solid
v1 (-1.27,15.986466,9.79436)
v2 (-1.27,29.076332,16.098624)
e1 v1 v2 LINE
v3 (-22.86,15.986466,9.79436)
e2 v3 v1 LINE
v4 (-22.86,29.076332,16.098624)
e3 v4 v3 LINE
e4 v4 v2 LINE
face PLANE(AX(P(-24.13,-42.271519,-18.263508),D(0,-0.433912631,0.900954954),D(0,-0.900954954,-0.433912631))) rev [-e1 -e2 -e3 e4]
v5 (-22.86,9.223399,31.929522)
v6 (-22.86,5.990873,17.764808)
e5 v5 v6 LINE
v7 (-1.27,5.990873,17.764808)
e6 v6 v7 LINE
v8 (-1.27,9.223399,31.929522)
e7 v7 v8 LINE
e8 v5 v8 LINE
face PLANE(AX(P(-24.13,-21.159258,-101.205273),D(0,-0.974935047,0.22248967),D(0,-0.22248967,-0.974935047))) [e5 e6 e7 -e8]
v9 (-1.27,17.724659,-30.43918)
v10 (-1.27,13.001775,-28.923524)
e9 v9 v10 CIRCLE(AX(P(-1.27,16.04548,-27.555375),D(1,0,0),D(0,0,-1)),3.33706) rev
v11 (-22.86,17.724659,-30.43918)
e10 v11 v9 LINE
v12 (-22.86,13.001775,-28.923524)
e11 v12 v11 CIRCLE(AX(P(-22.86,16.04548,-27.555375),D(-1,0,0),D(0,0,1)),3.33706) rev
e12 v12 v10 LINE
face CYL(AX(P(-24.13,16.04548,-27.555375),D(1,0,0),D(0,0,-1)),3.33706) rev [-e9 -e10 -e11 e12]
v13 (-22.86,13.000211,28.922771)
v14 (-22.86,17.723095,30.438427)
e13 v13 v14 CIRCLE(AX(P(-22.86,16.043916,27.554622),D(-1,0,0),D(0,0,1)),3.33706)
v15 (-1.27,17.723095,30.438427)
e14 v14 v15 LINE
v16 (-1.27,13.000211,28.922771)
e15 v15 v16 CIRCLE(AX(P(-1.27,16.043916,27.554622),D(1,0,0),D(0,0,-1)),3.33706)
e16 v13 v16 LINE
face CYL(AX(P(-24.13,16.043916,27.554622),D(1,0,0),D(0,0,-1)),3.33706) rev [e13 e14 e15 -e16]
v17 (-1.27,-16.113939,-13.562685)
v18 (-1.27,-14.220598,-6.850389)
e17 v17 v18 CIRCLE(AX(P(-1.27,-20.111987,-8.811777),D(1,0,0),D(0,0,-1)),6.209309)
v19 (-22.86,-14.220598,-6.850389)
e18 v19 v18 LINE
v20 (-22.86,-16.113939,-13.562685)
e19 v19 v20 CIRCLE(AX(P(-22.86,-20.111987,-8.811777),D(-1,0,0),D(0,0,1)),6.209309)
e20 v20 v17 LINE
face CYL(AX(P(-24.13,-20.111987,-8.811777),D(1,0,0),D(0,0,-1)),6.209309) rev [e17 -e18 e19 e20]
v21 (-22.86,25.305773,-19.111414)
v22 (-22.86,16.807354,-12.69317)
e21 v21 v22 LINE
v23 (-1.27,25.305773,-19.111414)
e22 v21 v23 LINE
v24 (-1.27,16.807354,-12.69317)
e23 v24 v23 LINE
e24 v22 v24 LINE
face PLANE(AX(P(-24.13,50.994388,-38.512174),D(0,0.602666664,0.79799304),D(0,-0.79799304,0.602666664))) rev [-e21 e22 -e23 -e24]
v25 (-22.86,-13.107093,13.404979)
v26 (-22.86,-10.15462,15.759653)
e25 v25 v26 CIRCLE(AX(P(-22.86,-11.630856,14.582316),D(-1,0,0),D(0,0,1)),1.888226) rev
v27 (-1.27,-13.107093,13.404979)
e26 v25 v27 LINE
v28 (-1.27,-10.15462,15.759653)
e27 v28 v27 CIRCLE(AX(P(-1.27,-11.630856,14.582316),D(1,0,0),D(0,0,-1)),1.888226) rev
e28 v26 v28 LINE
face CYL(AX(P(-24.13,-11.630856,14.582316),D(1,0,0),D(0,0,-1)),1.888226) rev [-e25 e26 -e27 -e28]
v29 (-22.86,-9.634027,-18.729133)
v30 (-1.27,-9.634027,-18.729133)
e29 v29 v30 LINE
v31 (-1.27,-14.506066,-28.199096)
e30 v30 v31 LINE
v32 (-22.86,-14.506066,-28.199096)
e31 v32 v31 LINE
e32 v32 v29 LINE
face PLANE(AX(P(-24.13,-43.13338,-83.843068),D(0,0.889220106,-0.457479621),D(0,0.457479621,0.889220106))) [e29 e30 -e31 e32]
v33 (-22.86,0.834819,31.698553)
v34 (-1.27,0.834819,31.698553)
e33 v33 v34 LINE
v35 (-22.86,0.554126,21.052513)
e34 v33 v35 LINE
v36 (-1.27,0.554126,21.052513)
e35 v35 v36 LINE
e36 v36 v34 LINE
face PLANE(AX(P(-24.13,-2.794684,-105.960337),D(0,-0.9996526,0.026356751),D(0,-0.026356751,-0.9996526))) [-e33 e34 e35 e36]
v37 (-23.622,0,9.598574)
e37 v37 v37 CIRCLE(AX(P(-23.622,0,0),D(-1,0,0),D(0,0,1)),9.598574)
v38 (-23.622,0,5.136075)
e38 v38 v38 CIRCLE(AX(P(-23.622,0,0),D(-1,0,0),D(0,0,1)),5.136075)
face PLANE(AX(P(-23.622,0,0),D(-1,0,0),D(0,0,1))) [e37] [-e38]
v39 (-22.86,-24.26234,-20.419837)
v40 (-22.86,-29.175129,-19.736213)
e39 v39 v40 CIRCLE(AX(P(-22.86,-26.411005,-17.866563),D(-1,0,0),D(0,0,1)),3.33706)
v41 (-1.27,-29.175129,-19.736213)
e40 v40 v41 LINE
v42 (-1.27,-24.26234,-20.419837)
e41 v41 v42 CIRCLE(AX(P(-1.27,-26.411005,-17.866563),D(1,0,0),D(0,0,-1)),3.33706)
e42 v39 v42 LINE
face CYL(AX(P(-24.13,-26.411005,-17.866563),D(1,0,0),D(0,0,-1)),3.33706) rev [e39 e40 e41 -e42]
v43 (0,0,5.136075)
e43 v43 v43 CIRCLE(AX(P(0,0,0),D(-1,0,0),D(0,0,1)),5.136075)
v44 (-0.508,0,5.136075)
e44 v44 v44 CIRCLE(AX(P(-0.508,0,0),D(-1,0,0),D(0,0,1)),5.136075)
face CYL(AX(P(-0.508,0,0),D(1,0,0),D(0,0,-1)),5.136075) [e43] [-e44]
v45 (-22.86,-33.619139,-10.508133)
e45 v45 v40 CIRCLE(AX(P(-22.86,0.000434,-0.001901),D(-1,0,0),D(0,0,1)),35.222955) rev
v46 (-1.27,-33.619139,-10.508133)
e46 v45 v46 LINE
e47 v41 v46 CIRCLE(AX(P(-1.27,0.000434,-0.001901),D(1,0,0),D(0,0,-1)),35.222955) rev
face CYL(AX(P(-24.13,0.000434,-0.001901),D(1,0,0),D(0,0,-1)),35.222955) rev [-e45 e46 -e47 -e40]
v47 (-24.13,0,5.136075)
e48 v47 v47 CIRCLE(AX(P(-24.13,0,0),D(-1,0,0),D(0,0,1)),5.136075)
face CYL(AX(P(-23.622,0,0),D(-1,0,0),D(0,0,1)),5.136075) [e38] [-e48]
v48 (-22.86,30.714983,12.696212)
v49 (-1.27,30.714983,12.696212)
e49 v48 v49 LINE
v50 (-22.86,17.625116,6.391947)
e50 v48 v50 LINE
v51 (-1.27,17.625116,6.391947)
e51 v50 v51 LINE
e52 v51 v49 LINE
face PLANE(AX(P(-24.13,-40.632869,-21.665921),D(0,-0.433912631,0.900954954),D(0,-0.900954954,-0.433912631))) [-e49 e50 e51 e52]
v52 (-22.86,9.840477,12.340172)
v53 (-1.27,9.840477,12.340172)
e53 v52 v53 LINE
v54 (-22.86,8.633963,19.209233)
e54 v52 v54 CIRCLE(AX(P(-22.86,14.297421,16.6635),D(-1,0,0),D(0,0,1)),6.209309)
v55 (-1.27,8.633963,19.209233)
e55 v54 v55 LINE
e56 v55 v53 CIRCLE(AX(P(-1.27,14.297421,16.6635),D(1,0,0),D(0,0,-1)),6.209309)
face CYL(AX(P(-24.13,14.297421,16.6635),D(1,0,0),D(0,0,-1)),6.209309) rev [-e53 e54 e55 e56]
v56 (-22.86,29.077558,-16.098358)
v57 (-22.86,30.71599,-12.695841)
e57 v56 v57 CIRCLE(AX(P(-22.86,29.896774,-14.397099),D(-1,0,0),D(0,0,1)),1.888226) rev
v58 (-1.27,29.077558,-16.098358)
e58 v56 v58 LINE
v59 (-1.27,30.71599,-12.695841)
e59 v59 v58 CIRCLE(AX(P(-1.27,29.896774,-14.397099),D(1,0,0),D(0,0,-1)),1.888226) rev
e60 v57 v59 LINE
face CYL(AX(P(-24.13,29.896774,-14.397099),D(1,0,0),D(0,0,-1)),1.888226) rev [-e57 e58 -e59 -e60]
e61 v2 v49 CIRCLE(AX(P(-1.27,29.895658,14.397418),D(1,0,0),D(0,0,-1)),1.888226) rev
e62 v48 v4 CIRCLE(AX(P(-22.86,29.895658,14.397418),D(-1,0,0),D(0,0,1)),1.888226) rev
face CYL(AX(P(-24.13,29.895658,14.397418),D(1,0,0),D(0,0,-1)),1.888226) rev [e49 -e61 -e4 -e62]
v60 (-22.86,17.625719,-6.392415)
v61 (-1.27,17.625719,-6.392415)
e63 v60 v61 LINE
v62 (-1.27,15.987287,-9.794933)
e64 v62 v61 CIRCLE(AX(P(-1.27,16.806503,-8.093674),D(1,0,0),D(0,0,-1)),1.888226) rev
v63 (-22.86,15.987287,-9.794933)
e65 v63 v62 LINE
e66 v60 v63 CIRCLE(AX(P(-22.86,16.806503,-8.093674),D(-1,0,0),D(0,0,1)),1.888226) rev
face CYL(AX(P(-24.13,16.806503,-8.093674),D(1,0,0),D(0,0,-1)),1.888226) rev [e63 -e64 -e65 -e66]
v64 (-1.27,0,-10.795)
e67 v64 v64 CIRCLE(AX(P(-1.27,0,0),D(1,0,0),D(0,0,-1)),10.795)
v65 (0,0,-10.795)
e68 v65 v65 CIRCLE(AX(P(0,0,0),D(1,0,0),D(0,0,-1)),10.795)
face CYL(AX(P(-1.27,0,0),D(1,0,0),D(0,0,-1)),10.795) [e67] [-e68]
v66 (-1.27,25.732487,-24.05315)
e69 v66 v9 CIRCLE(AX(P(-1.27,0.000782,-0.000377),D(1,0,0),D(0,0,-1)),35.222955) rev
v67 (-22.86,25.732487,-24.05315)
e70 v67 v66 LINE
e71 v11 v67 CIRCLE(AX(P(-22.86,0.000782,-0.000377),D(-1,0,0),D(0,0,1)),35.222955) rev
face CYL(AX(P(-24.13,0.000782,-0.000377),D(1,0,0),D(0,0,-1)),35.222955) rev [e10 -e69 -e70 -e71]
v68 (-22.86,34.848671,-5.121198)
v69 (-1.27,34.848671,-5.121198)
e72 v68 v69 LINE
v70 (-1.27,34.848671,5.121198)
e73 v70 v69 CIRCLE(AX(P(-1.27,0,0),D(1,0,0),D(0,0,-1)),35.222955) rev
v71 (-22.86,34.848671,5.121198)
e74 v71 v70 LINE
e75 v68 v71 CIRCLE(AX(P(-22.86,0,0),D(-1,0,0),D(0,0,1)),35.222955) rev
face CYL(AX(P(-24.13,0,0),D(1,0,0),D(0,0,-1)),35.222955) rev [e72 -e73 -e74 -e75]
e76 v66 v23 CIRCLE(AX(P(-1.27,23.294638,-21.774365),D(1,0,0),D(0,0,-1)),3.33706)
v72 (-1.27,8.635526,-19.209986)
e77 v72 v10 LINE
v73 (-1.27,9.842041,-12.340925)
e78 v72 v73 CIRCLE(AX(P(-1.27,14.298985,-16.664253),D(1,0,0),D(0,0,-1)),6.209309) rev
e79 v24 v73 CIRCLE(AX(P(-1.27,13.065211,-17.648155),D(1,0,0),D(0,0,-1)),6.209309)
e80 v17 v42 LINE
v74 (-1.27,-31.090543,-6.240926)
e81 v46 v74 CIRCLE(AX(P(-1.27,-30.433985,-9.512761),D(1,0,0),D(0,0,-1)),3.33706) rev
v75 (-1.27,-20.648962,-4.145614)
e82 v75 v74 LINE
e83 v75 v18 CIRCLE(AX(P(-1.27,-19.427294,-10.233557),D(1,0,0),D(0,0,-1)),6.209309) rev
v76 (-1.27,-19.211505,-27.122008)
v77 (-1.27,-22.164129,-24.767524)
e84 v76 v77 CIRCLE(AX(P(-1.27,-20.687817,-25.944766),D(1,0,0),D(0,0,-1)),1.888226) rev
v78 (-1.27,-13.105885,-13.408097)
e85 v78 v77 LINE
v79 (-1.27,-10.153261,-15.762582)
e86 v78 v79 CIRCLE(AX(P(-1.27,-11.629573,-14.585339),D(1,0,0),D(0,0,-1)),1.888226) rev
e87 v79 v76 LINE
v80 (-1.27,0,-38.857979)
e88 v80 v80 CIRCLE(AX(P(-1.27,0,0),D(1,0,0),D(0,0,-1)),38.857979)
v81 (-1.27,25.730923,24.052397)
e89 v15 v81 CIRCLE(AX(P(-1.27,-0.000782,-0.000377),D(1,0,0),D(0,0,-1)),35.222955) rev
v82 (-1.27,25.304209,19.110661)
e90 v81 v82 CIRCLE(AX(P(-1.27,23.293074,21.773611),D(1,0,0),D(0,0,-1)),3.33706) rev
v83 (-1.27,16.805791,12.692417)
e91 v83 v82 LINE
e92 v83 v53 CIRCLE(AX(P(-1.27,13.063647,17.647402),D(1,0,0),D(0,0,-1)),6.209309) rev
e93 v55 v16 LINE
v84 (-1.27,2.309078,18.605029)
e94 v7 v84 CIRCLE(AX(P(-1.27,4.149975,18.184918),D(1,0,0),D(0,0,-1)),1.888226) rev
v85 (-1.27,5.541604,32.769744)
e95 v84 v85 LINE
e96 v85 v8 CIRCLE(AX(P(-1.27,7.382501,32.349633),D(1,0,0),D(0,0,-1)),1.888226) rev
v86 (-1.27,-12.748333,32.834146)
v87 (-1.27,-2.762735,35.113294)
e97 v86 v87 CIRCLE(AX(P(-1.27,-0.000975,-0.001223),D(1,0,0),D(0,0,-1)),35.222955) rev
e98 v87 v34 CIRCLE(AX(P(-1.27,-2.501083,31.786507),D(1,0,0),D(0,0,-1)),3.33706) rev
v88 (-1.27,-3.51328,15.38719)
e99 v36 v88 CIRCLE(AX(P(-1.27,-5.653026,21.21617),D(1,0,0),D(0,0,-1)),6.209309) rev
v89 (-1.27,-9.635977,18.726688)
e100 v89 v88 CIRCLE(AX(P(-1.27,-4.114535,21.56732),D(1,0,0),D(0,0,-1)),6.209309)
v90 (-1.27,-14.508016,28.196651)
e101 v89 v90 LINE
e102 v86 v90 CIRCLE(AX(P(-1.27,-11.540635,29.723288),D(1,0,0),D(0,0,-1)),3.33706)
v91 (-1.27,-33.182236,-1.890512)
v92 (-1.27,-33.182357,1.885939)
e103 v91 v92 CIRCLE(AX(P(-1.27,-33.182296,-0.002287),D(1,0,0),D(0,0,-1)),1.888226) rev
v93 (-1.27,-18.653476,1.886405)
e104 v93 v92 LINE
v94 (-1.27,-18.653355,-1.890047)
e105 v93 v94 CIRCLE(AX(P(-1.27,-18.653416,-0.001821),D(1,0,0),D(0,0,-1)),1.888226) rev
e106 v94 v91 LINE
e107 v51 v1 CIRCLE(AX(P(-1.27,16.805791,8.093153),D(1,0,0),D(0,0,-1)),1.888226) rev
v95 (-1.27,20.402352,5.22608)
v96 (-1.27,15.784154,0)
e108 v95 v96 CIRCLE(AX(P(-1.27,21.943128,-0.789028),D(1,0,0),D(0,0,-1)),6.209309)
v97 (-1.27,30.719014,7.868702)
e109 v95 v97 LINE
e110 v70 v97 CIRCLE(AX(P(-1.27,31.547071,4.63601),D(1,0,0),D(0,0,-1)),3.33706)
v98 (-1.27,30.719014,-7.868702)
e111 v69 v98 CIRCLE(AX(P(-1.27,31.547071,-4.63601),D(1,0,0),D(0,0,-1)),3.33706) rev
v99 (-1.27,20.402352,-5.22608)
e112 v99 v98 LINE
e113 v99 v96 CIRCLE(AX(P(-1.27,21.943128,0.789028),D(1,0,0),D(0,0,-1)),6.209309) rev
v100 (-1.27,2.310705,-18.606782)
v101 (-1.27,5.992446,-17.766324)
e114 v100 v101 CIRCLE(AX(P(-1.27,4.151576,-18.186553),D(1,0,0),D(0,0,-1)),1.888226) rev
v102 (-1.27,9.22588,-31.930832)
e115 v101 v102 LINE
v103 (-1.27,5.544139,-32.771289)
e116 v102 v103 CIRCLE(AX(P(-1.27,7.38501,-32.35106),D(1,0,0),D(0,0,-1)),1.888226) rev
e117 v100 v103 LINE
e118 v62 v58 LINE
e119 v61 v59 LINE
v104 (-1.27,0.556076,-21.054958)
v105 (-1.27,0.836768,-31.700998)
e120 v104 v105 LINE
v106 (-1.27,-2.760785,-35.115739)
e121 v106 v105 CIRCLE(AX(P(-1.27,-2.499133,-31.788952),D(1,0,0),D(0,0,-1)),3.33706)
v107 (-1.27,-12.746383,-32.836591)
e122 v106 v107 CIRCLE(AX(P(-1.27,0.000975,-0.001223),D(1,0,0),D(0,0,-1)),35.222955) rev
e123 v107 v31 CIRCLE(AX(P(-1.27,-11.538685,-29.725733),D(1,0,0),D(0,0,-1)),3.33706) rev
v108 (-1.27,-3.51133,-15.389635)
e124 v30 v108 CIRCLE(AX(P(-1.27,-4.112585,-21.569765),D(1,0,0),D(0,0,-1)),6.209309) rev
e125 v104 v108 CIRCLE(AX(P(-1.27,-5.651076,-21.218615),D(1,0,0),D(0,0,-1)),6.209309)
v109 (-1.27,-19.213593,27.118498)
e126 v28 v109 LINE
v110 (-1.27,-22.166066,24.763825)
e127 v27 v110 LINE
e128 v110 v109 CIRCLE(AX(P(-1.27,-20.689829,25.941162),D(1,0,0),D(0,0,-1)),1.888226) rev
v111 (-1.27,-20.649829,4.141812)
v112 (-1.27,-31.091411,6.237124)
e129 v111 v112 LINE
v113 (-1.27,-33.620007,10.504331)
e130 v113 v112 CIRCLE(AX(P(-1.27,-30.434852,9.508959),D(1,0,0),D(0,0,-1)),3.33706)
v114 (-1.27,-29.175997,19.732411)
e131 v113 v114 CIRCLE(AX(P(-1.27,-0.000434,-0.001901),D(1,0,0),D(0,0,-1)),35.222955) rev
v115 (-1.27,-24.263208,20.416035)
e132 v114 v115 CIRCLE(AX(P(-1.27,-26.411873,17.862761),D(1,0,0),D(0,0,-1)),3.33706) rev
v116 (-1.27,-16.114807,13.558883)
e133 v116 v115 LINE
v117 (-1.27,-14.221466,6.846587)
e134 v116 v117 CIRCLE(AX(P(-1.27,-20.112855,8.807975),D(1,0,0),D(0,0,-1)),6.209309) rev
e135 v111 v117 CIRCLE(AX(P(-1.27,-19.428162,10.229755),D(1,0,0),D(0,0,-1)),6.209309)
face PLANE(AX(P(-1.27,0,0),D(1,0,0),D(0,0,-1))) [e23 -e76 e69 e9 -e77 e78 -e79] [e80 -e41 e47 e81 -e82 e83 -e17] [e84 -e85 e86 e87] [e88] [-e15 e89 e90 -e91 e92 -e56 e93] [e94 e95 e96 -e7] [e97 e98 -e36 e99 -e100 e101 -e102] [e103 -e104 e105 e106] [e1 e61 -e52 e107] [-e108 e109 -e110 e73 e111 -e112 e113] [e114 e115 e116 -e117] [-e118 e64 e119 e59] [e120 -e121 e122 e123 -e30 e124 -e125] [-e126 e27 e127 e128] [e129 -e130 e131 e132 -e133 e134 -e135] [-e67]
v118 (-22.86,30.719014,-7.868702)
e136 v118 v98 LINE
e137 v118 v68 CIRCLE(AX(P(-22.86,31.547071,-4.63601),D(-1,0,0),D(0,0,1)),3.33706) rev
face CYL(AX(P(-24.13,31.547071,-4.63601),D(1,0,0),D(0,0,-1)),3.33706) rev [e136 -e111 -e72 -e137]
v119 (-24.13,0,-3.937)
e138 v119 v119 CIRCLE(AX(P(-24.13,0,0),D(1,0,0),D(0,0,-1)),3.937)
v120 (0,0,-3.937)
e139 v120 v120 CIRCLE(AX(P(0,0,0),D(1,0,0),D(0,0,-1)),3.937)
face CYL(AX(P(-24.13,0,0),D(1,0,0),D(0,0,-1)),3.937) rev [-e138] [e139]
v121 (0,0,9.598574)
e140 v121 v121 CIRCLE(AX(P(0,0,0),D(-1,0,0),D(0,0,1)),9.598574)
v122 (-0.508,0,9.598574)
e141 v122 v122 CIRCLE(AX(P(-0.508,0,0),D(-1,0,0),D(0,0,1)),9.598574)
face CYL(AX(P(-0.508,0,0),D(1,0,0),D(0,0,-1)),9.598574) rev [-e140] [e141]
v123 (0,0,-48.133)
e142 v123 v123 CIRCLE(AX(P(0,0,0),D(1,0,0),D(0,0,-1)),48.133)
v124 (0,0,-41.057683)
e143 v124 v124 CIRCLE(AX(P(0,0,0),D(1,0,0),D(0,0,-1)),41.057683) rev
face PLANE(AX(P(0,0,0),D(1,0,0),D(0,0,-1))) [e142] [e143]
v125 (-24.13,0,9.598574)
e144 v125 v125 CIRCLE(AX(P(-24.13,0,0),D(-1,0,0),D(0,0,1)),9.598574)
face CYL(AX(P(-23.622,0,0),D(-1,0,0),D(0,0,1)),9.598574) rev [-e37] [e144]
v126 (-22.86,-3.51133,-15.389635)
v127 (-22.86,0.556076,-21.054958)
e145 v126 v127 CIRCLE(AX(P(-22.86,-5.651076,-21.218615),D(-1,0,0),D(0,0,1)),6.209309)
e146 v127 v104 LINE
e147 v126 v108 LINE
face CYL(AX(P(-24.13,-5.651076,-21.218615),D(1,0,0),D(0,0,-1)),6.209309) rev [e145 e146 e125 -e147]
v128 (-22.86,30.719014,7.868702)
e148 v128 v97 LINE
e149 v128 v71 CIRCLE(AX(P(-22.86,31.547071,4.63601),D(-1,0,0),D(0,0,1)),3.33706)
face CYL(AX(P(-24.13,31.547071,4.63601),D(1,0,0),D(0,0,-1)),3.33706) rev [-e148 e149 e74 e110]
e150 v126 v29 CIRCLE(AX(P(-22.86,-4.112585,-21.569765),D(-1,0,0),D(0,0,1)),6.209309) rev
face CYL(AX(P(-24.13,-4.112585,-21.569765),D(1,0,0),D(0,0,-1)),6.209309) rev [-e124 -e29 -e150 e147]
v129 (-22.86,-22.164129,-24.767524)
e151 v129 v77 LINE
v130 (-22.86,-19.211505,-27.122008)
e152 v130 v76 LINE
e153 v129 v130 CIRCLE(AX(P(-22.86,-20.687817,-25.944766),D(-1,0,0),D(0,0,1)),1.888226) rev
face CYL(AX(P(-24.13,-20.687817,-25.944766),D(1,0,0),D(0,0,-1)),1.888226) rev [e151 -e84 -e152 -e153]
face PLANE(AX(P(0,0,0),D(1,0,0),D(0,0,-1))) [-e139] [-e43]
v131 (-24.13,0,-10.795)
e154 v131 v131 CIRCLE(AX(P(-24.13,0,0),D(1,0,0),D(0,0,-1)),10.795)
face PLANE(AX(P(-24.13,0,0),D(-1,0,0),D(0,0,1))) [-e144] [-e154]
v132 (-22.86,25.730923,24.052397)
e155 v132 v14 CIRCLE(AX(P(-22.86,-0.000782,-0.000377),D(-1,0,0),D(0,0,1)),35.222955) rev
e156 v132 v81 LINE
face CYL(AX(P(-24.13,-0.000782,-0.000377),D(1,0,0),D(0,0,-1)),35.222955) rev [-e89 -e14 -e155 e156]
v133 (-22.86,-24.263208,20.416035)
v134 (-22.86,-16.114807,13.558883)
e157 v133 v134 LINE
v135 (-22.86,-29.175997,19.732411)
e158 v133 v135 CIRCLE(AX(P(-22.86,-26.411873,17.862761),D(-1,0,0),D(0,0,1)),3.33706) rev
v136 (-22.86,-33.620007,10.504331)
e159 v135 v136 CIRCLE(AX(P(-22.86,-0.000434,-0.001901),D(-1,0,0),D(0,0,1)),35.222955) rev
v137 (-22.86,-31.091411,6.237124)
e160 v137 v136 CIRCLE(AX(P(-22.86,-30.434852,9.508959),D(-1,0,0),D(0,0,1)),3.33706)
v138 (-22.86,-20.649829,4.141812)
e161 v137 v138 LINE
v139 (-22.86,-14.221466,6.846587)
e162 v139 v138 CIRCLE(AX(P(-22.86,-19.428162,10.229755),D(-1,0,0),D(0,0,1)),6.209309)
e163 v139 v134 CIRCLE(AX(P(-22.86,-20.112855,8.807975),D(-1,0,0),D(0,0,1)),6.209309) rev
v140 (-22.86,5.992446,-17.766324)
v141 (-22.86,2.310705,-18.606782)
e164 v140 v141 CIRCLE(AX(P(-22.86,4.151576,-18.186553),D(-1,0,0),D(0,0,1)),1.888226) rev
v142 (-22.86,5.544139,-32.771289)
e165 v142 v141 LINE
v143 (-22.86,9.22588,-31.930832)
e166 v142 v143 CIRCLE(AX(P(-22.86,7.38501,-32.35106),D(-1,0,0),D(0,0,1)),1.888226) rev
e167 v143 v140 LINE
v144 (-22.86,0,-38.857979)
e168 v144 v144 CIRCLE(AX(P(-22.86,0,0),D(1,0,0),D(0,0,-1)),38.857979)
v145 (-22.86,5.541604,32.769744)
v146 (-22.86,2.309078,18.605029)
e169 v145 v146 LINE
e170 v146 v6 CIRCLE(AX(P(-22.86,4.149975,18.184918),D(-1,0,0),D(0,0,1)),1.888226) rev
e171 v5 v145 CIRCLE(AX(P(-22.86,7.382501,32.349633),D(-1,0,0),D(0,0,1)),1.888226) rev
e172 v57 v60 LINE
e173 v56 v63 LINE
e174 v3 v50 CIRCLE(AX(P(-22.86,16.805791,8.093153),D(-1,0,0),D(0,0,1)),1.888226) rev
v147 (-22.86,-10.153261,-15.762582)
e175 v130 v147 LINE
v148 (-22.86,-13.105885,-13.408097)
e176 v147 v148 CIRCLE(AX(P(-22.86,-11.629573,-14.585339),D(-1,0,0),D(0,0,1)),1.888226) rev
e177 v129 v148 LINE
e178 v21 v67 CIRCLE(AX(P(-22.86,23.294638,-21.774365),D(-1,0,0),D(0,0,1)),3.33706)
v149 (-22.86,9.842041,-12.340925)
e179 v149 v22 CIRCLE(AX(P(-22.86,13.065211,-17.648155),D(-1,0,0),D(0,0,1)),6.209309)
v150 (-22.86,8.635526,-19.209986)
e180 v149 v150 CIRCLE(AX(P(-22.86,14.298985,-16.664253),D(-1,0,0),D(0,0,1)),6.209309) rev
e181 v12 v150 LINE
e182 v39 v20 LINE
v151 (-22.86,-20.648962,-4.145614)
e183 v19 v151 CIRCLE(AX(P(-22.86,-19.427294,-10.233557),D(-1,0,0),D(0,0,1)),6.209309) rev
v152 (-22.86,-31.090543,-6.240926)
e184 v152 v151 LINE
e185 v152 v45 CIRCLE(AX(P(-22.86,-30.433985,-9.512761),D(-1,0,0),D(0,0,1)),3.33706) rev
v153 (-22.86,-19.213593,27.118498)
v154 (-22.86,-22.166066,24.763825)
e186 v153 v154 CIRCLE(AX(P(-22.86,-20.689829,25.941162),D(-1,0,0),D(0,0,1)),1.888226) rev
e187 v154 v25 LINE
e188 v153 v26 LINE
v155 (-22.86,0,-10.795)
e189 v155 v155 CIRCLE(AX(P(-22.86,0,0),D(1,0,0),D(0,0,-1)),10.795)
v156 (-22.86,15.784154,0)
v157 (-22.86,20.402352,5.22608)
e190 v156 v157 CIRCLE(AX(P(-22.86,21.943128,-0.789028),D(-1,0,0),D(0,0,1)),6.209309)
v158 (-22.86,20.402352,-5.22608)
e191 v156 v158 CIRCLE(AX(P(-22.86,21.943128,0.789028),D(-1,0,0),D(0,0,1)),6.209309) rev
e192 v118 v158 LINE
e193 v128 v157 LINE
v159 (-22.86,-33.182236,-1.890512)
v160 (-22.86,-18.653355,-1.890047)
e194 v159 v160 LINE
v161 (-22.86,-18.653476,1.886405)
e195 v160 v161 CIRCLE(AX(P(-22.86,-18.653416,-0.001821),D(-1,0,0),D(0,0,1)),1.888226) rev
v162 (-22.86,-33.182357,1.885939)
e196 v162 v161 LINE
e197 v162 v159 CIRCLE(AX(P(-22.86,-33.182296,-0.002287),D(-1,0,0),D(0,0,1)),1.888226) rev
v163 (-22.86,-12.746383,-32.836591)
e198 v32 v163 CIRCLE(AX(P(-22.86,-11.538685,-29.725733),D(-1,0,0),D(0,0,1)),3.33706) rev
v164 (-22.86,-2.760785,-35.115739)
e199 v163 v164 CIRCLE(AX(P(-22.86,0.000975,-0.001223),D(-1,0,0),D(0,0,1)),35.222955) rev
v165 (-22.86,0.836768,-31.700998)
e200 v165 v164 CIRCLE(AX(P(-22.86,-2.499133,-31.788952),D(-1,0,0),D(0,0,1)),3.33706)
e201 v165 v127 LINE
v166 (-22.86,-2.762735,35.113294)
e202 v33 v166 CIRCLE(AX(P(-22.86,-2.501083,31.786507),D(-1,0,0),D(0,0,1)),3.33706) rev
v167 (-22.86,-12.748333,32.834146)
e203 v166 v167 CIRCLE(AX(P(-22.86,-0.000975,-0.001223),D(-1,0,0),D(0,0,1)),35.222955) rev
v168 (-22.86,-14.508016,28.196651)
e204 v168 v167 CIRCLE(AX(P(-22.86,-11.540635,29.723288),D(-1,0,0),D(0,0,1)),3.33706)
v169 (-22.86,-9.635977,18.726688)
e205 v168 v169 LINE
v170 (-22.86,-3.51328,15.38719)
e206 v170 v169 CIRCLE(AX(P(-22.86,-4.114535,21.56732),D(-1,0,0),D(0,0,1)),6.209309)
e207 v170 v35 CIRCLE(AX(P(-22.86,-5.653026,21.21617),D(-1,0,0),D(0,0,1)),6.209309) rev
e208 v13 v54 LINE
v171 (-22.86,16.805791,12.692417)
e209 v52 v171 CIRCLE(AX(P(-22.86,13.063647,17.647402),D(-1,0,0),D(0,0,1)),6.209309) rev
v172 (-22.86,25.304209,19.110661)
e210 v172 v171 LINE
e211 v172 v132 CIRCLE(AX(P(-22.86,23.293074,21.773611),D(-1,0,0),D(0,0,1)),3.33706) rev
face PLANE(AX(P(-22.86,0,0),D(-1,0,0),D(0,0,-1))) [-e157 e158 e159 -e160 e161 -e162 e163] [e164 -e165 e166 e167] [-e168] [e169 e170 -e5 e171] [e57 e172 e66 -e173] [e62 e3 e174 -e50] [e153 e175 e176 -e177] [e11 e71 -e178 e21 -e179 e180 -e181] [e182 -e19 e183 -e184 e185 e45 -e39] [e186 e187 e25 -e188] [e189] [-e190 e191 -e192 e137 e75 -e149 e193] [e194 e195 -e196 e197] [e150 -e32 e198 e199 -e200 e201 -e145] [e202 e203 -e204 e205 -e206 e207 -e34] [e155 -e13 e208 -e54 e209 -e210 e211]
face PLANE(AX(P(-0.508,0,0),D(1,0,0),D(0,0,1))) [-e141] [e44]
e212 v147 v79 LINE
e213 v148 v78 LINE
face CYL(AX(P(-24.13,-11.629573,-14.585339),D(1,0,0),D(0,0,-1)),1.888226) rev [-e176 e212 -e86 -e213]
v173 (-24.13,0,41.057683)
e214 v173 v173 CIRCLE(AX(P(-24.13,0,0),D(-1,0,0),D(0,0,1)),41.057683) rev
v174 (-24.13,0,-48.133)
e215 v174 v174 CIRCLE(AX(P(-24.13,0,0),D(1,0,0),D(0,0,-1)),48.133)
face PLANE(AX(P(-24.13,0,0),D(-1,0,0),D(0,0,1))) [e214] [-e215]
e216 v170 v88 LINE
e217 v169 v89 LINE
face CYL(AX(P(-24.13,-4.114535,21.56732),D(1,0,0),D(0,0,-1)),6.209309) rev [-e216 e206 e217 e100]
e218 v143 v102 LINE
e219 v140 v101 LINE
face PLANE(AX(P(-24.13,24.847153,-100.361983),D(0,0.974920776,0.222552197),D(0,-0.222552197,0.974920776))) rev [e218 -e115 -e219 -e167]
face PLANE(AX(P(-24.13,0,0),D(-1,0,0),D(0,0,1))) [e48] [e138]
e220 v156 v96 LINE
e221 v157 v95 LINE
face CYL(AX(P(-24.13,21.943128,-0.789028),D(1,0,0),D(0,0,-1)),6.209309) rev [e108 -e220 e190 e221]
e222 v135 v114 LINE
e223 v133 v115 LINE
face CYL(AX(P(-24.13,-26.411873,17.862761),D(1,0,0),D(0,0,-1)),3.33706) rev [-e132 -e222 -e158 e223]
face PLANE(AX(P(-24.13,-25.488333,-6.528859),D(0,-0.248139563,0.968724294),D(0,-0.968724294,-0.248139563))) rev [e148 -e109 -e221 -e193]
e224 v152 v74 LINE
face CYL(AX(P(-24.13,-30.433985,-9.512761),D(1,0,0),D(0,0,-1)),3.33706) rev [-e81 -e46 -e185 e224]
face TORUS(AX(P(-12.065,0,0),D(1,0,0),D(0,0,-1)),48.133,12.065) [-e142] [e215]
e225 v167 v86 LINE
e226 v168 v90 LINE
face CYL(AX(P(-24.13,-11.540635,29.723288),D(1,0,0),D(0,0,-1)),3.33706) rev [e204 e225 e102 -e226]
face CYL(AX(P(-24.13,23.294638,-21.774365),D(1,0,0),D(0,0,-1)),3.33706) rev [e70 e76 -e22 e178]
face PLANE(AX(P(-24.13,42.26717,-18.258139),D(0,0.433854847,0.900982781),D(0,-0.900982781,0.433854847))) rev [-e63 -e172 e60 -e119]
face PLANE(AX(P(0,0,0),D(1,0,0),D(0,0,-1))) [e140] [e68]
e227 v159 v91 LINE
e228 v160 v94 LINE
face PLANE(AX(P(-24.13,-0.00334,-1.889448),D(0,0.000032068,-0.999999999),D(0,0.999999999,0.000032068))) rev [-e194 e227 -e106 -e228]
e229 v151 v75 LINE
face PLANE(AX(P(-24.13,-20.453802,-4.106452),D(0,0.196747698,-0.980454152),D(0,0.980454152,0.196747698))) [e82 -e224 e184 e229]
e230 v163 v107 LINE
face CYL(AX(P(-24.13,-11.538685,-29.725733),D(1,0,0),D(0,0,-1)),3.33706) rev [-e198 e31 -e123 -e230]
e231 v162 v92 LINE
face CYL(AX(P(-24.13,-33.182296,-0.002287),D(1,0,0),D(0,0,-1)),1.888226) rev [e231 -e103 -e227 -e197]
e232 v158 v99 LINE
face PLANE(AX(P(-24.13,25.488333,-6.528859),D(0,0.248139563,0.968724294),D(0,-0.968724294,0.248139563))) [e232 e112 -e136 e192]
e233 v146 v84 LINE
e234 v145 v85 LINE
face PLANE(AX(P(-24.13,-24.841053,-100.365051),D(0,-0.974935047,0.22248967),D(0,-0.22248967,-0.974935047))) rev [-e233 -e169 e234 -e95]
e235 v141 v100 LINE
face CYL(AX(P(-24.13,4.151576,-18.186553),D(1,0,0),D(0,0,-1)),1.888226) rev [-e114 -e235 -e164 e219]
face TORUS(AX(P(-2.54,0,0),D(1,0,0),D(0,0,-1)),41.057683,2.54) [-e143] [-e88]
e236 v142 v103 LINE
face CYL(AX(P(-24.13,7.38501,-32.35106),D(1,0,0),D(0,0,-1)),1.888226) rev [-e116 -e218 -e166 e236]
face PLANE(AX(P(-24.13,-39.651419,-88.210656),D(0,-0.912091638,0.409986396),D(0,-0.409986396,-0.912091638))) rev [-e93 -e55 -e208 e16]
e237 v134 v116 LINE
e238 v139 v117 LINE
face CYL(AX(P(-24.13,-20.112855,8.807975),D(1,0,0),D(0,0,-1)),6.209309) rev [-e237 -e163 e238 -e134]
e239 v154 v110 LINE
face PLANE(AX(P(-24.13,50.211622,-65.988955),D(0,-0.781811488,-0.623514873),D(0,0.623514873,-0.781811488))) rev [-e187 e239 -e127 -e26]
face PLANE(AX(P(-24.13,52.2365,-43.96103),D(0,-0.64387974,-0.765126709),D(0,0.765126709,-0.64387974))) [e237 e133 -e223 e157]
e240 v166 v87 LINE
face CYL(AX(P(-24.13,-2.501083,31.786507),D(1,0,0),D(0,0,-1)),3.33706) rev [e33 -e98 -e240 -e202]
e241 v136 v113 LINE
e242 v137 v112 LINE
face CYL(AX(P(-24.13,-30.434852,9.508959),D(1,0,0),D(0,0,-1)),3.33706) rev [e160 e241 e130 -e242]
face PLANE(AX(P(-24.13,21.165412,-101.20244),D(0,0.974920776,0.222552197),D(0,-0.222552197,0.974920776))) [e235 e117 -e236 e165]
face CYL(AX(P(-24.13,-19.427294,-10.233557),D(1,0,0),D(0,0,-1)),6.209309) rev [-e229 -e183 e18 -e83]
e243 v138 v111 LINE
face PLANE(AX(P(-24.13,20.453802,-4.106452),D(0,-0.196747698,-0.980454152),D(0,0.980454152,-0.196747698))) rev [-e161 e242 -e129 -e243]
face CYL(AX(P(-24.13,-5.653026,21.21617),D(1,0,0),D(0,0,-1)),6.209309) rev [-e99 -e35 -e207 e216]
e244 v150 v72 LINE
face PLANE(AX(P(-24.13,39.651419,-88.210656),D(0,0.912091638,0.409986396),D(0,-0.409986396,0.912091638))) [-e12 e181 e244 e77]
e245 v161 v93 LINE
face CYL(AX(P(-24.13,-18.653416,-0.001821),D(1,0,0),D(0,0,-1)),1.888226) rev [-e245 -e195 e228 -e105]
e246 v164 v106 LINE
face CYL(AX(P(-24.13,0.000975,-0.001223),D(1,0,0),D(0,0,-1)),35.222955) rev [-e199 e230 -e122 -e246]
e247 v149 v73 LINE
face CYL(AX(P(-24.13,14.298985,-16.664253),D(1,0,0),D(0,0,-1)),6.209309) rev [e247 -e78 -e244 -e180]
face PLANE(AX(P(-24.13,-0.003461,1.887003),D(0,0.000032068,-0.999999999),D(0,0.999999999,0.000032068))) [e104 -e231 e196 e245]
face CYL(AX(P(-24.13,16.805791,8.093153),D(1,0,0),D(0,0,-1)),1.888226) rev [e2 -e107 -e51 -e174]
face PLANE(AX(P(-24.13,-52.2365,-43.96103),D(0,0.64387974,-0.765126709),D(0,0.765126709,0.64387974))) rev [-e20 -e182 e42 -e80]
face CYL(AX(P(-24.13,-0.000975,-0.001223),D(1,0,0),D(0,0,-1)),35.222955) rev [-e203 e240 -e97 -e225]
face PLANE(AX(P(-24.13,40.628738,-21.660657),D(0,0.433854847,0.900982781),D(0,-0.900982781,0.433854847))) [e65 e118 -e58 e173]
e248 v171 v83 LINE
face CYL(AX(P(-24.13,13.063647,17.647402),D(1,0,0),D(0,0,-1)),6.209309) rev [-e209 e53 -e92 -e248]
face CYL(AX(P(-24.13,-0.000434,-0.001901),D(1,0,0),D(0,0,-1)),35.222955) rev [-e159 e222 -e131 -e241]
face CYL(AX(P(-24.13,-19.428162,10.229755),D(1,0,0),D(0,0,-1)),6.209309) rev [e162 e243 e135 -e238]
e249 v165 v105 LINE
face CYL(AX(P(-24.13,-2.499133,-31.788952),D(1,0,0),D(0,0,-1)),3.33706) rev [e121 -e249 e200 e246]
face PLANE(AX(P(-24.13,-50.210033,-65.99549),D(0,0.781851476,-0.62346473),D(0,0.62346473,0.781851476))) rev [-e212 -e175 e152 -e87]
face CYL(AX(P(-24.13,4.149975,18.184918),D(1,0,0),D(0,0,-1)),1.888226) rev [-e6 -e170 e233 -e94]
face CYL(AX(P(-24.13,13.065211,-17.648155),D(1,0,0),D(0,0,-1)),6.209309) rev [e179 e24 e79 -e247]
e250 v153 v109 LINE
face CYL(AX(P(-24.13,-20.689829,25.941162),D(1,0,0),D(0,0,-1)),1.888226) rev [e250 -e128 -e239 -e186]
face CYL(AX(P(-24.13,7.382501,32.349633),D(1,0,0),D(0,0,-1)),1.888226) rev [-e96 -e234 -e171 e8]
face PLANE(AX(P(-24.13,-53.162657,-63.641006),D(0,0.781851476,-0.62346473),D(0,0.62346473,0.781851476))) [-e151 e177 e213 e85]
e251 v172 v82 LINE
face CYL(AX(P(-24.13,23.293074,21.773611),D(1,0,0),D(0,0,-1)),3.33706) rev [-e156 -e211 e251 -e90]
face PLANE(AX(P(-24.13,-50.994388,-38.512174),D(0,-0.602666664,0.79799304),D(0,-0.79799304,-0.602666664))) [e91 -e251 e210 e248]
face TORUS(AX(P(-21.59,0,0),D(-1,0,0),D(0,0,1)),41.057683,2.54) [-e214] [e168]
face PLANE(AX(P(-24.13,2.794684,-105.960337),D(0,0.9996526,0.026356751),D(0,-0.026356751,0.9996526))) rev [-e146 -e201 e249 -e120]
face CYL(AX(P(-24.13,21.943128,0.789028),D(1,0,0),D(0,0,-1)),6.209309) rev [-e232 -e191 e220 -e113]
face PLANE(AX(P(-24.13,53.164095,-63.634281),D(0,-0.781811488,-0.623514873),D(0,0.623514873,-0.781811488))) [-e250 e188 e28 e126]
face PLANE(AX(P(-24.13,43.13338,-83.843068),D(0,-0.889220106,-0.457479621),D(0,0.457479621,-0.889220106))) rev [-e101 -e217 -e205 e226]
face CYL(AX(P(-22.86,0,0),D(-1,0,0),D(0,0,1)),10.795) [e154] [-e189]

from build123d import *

# Parameters (mm, degrees)
SKETCH2_R          = 3.937
CUT_EXTRUDE1_DEPTH = 89.486469768
CUT_EXTRUDE2_DEPTH = 89.486469768
SKETCH5_R          = 38.857978685
SKETCH5_R_2        = 10.795
CUT_EXTRUDE3_DEPTH = 1.27
SKETCH6_R          = 9.598574497
SKETCH6_R_2        = 5.136074626
CUT_EXTRUDE4_DEPTH = 0.508
FILLET3_R          = 2.54


with BuildPart() as part:
    # Sketch1 → Revolve1 (revolve)
    with BuildSketch(Plane(origin=(0, 0, 0), x_dir=(1, 0, 0), z_dir=(0, 1, 0))):
        with BuildLine():
            Line((0, 0), (-24.13, 0))
            Line((-24.13, 0), (-24.13, 48.133))
            ThreePointArc((-24.13, 48.133), (-12.065, 60.198), (0, 48.133))
            Line((0, 48.133), (0, 0))
        make_face()
    revolve(axis=Axis((0, 0, 0), (-1, 0, 0)))

    # Sketch2 → Cut-Extrude1 (cut, through all)
    with BuildSketch(Plane(origin=(0, 0, 0), x_dir=(0, 0, -1), z_dir=(1, 0, 0))):
        Circle(SKETCH2_R)
    extrude(amount=-CUT_EXTRUDE1_DEPTH, mode=Mode.SUBTRACT)

    # Sketch3 → Cut-Extrude2 (cut, through all)
    with BuildSketch(Plane(origin=(0, 0, 0), x_dir=(0, 0, -1), z_dir=(1, 0, 0))):
        with BuildLine():
            ThreePointArc((-7.868701987, 30.719014265), (-7.414350559, 33.395529437), (-5.121198299, 34.848671341))
            ThreePointArc((-5.121198299, 34.848671341), (0, 35.222955104), (5.121198299, 34.848671341))
            ThreePointArc((5.121198299, 34.848671341), (7.414350559, 33.395529437), (7.868701987, 30.719014265))
            Line((7.868701987, 30.719014265), (5.226080148, 20.402352367))
            ThreePointArc((5.226080148, 20.402352367), (3.322663277, 17.290224183), (0, 15.784154342))
            ThreePointArc((0, 15.784154342), (-3.322663277, 17.290224183), (-5.226080148, 20.402352367))
            Line((-5.226080148, 20.402352367), (-7.868701987, 30.719014265))
        make_face()
        with BuildLine():
            Line((-16.098624321, 29.076332472), (-9.794359632, 15.986465761))
            ThreePointArc((-9.794359632, 15.986465761), (-7.273828196, 15.104584389), (-6.391946824, 17.625115825))
            Line((-6.391946824, 17.625115825), (-12.696211514, 30.714982536))
            ThreePointArc((-12.696211514, 30.714982536), (-15.216742949, 31.596863908), (-16.098624321, 29.076332472))
        make_face()
        with BuildLine():
            ThreePointArc((-12.340172279, 9.840477432), (-15.589311763, 8.181733863), (-19.209232563, 8.633962814))
            Line((-19.209232563, 8.633962814), (-28.922771395, 13.000211347))
            ThreePointArc((-28.922771395, 13.000211347), (-30.732071739, 15.024217511), (-30.438426779, 17.7230953))
            ThreePointArc((-30.438426779, 17.7230953), (-27.538038696, 21.960371467), (-24.052396954, 25.730923416))
            ThreePointArc((-24.052396954, 25.730923416), (-21.486527816, 26.61776289), (-19.11066051, 25.304209225))
            Line((-19.11066051, 25.304209225), (-12.692417211, 16.805790793))
            ThreePointArc((-12.692417211, 16.805790793), (-11.446018427, 13.377259374), (-12.340172279, 9.840477432))
        make_face()
        with BuildLine():
            Line((-32.7697437, 5.541603622), (-18.605029061, 2.309077827))
            ThreePointArc((-18.605029061, 2.309077827), (-16.344020796, 3.729864614), (-17.764807583, 5.99087288))
            Line((-17.764807583, 5.99087288), (-31.929522221, 9.223398675))
            ThreePointArc((-31.929522221, 9.223398675), (-34.190530487, 7.802611888), (-32.7697437, 5.541603622))
        make_face()
        with BuildLine():
            ThreePointArc((-15.387190118, -3.513279694), (-16.116137508, -7.087768933), (-18.726688041, -9.635976839))
            Line((-18.726688041, -9.635976839), (-28.196651006, -14.508015872))
            ThreePointArc((-28.196651006, -14.508015872), (-30.907163058, -14.660636639), (-32.834146044, -12.748332988))
            ThreePointArc((-32.834146044, -12.748332988), (-34.33861956, -7.838819794), (-35.113293701, -2.762734656))
            ThreePointArc((-35.113293701, -2.762734656), (-34.20685948, -0.203722017), (-31.698552836, 0.834818527))
            Line((-31.698552836, 0.834818527), (-21.052512511, 0.554125976))
            ThreePointArc((-21.052512511, 0.554125976), (-17.594861779, -0.60905459), (-15.387190118, -3.513279694))
        make_face()
        with BuildLine():
            Line((-24.763824671, -22.166065784), (-13.404979114, -13.107092807))
            ThreePointArc((-13.404979114, -13.107092807), (-13.106079358, -10.45351929), (-15.759652875, -10.154619535))
            Line((-15.759652875, -10.154619535), (-27.118498432, -19.213592512))
            ThreePointArc((-27.118498432, -19.213592512), (-27.417398188, -21.867166029), (-24.763824671, -22.166065784))
        make_face()
        with BuildLine():
            ThreePointArc((-6.846586936, -14.221465552), (-4.506429979, -17.020037158), (-4.141812449, -20.649829394))
            Line((-4.141812449, -20.649829394), (-6.237124282, -31.091411229))
            ThreePointArc((-6.237124282, -31.091411229), (-7.807777183, -33.305732377), (-10.504330622, -33.620006517))
            ThreePointArc((-10.504330622, -33.620006517), (-15.280766495, -31.735219868), (-19.73241109, -29.175997183))
            ThreePointArc((-19.73241109, -29.175997183), (-21.167975243, -26.87180009), (-20.416035323, -24.263207549))
            Line((-20.416035323, -24.263207549), (-13.558883477, -16.114807003))
            ThreePointArc((-13.558883477, -16.114807003), (-10.493662321, -14.136738026), (-6.846586936, -14.221465552))
        make_face()
        with BuildLine():
            Line((1.890512446, -33.182235549), (1.890046539, -18.653355221))
            ThreePointArc((1.890046539, -18.653355221), (0.001760172, -16.765189956), (-1.886405093, -18.653476323))
            Line((-1.886405093, -18.653476323), (-1.885939187, -33.182356651))
            ThreePointArc((-1.885939187, -33.182356651), (0.00234718, -35.070521916), (1.890512446, -33.182235549))
        make_face()
        with BuildLine():
            ThreePointArc((6.850388874, -14.220597785), (10.497464259, -14.135870258), (13.562685415, -16.113939236))
            Line((13.562685415, -16.113939236), (20.419837261, -24.262339782))
            ThreePointArc((20.419837261, -24.262339782), (21.171777181, -26.870932322), (19.736213028, -29.175129416))
            ThreePointArc((19.736213028, -29.175129416), (15.284568432, -31.734352101), (10.50813256, -33.619138749))
            ThreePointArc((10.50813256, -33.619138749), (7.811579121, -33.30486461), (6.240926219, -31.090543462))
            Line((6.240926219, -31.090543462), (4.145614387, -20.648961626))
            ThreePointArc((4.145614387, -20.648961626), (4.510231917, -17.019169391), (6.850388874, -14.220597785))
        make_face()
        with BuildLine():
            Line((27.122008151, -19.211505151), (15.762581618, -10.153260695))
            ThreePointArc((15.762581618, -10.153260695), (13.109027277, -10.452330638), (13.408097219, -13.105884979))
            Line((13.408097219, -13.105884979), (24.767523753, -22.164129435))
            ThreePointArc((24.767523753, -22.164129435), (27.421078094, -21.865059493), (27.122008151, -19.211505151))
        make_face()
        with BuildLine():
            ThreePointArc((15.389635159, -3.511329838), (17.597306821, -0.607104734), (21.054957553, 0.556075831))
            Line((21.054957553, 0.556075831), (31.700997878, 0.836768383))
            ThreePointArc((31.700997878, 0.836768383), (34.209304522, -0.201772161), (35.115738743, -2.7607848))
            ThreePointArc((35.115738743, -2.7607848), (34.341064602, -7.836869939), (32.836591086, -12.746383132))
            ThreePointArc((32.836591086, -12.746383132), (30.9096081, -14.658686784), (28.199096048, -14.506066016))
            Line((28.199096048, -14.506066016), (18.729133083, -9.634026983))
            ThreePointArc((18.729133083, -9.634026983), (16.11858255, -7.085819077), (15.389635159, -3.511329838))
        make_face()
        with BuildLine():
            Line((31.930831552, 9.225880469), (17.766324261, 5.992446224))
            ThreePointArc((17.766324261, 5.992446224), (16.345682487, 3.73134684), (18.606781871, 2.310705066))
            Line((18.606781871, 2.310705066), (32.771289161, 5.544139311))
            ThreePointArc((32.771289161, 5.544139311), (34.191930935, 7.805238695), (31.930831552, 9.225880469))
        make_face()
        with BuildLine():
            ThreePointArc((12.340925299, 9.842041095), (11.446771448, 13.378823037), (12.693170232, 16.807354456))
            Line((12.693170232, 16.807354456), (19.111413531, 25.305772888))
            ThreePointArc((19.111413531, 25.305772888), (21.487280836, 26.619326553), (24.053149974, 25.732487079))
            ThreePointArc((24.053149974, 25.732487079), (27.538791716, 21.96193513), (30.4391798, 17.724658963))
            ThreePointArc((30.4391798, 17.724658963), (30.732824759, 15.025781174), (28.923524416, 13.00177501))
            Line((28.923524416, 13.00177501), (19.209985583, 8.635526477))
            ThreePointArc((19.209985583, 8.635526477), (15.590064784, 8.183297526), (12.340925299, 9.842041095))
        make_face()
        with BuildLine():
            Line((12.695840543, 30.715989922), (6.392415389, 17.625718912))
            ThreePointArc((6.392415389, 17.625718912), (7.274458414, 15.105244041), (9.794933285, 15.987287066))
            Line((9.794933285, 15.987287066), (16.098358439, 29.077558076))
            ThreePointArc((16.098358439, 29.077558076), (15.216315414, 31.598032947), (12.695840543, 30.715989922))
        make_face()
    extrude(amount=-CUT_EXTRUDE2_DEPTH, mode=Mode.SUBTRACT)

    # Sketch5 → Cut-Extrude3 (cut)
    with BuildSketch(Plane(origin=(0, 0, 0), x_dir=(0, 0, -1), z_dir=(1, 0, 0))):
        Circle(SKETCH5_R)
        Circle(SKETCH5_R_2, mode=Mode.SUBTRACT)
    cut_extrude3 = extrude(amount=-CUT_EXTRUDE3_DEPTH, mode=Mode.SUBTRACT)

    # Sketch6 → Cut-Extrude4 (cut)
    with BuildSketch(Plane.ZY.offset(24.13)):
        Circle(SKETCH6_R)
        Circle(SKETCH6_R_2, mode=Mode.SUBTRACT)
    cut_extrude4 = extrude(amount=-CUT_EXTRUDE4_DEPTH, mode=Mode.SUBTRACT)

    # Mirror8: Cut-Extrude3 across plane
    add(cut_extrude3.mirror(Plane(origin=(-12.065, 0, 0), x_dir=(0, 0, 1), z_dir=(1, 0, 0))), mode=Mode.SUBTRACT)

    # Mirror11: Cut-Extrude4 across plane
    add(cut_extrude4.mirror(Plane(origin=(-12.065, 0, 0), x_dir=(0, 0, 1), z_dir=(1, 0, 0))), mode=Mode.SUBTRACT)

    # Fillet3
    # the kernel refuses this fillet: 2.54 mm, written as the material it takes off along each edge
    with BuildSketch(Plane(origin=(0, 0, 0), x_dir=(0, 0, -1), z_dir=(0, -1, 0))) as fillet3_piece_1:
        with BuildLine():
            CenterArc((41.05768321, -2.54), FILLET3_R, 90, 60)
            Line((38.857978685, -1.27), (38.813984594, -1.2446))
            ThreePointArc((38.813984594, -1.2446), (38.807178685, -0.635), (38.807178685, 0))
            Line((38.807178685, 0), (38.857978685, 0.0508))
            Line((38.857978685, 0.0508), (41.05768321, 0.0508))
            Line((41.05768321, 0.0508), (41.05768321, 0))
        make_face()
    revolve(axis=Axis((0, 0, 0), (1, 0, 0)), mode=Mode.SUBTRACT)
    with BuildSketch(Plane(origin=(-24.13, 0, 0), x_dir=(0, 0, -1), z_dir=(0, -1, 0))) as fillet3_piece_2:
        with BuildLine():
            CenterArc((41.05768321, 2.54), FILLET3_R, 210, 60)
            Line((38.857978685, 1.27), (38.813984594, 1.2446))
            ThreePointArc((38.813984594, 1.2446), (38.807178685, 0.635), (38.807178685, 0))
            Line((38.807178685, 0), (38.857978685, -0.0508))
            Line((38.857978685, -0.0508), (41.05768321, -0.0508))
            Line((41.05768321, -0.0508), (41.05768321, 0))
        make_face()
    revolve(axis=Axis((-24.13, 0, 0), (1, 0, 0)), mode=Mode.SUBTRACT)


solid = part.part
